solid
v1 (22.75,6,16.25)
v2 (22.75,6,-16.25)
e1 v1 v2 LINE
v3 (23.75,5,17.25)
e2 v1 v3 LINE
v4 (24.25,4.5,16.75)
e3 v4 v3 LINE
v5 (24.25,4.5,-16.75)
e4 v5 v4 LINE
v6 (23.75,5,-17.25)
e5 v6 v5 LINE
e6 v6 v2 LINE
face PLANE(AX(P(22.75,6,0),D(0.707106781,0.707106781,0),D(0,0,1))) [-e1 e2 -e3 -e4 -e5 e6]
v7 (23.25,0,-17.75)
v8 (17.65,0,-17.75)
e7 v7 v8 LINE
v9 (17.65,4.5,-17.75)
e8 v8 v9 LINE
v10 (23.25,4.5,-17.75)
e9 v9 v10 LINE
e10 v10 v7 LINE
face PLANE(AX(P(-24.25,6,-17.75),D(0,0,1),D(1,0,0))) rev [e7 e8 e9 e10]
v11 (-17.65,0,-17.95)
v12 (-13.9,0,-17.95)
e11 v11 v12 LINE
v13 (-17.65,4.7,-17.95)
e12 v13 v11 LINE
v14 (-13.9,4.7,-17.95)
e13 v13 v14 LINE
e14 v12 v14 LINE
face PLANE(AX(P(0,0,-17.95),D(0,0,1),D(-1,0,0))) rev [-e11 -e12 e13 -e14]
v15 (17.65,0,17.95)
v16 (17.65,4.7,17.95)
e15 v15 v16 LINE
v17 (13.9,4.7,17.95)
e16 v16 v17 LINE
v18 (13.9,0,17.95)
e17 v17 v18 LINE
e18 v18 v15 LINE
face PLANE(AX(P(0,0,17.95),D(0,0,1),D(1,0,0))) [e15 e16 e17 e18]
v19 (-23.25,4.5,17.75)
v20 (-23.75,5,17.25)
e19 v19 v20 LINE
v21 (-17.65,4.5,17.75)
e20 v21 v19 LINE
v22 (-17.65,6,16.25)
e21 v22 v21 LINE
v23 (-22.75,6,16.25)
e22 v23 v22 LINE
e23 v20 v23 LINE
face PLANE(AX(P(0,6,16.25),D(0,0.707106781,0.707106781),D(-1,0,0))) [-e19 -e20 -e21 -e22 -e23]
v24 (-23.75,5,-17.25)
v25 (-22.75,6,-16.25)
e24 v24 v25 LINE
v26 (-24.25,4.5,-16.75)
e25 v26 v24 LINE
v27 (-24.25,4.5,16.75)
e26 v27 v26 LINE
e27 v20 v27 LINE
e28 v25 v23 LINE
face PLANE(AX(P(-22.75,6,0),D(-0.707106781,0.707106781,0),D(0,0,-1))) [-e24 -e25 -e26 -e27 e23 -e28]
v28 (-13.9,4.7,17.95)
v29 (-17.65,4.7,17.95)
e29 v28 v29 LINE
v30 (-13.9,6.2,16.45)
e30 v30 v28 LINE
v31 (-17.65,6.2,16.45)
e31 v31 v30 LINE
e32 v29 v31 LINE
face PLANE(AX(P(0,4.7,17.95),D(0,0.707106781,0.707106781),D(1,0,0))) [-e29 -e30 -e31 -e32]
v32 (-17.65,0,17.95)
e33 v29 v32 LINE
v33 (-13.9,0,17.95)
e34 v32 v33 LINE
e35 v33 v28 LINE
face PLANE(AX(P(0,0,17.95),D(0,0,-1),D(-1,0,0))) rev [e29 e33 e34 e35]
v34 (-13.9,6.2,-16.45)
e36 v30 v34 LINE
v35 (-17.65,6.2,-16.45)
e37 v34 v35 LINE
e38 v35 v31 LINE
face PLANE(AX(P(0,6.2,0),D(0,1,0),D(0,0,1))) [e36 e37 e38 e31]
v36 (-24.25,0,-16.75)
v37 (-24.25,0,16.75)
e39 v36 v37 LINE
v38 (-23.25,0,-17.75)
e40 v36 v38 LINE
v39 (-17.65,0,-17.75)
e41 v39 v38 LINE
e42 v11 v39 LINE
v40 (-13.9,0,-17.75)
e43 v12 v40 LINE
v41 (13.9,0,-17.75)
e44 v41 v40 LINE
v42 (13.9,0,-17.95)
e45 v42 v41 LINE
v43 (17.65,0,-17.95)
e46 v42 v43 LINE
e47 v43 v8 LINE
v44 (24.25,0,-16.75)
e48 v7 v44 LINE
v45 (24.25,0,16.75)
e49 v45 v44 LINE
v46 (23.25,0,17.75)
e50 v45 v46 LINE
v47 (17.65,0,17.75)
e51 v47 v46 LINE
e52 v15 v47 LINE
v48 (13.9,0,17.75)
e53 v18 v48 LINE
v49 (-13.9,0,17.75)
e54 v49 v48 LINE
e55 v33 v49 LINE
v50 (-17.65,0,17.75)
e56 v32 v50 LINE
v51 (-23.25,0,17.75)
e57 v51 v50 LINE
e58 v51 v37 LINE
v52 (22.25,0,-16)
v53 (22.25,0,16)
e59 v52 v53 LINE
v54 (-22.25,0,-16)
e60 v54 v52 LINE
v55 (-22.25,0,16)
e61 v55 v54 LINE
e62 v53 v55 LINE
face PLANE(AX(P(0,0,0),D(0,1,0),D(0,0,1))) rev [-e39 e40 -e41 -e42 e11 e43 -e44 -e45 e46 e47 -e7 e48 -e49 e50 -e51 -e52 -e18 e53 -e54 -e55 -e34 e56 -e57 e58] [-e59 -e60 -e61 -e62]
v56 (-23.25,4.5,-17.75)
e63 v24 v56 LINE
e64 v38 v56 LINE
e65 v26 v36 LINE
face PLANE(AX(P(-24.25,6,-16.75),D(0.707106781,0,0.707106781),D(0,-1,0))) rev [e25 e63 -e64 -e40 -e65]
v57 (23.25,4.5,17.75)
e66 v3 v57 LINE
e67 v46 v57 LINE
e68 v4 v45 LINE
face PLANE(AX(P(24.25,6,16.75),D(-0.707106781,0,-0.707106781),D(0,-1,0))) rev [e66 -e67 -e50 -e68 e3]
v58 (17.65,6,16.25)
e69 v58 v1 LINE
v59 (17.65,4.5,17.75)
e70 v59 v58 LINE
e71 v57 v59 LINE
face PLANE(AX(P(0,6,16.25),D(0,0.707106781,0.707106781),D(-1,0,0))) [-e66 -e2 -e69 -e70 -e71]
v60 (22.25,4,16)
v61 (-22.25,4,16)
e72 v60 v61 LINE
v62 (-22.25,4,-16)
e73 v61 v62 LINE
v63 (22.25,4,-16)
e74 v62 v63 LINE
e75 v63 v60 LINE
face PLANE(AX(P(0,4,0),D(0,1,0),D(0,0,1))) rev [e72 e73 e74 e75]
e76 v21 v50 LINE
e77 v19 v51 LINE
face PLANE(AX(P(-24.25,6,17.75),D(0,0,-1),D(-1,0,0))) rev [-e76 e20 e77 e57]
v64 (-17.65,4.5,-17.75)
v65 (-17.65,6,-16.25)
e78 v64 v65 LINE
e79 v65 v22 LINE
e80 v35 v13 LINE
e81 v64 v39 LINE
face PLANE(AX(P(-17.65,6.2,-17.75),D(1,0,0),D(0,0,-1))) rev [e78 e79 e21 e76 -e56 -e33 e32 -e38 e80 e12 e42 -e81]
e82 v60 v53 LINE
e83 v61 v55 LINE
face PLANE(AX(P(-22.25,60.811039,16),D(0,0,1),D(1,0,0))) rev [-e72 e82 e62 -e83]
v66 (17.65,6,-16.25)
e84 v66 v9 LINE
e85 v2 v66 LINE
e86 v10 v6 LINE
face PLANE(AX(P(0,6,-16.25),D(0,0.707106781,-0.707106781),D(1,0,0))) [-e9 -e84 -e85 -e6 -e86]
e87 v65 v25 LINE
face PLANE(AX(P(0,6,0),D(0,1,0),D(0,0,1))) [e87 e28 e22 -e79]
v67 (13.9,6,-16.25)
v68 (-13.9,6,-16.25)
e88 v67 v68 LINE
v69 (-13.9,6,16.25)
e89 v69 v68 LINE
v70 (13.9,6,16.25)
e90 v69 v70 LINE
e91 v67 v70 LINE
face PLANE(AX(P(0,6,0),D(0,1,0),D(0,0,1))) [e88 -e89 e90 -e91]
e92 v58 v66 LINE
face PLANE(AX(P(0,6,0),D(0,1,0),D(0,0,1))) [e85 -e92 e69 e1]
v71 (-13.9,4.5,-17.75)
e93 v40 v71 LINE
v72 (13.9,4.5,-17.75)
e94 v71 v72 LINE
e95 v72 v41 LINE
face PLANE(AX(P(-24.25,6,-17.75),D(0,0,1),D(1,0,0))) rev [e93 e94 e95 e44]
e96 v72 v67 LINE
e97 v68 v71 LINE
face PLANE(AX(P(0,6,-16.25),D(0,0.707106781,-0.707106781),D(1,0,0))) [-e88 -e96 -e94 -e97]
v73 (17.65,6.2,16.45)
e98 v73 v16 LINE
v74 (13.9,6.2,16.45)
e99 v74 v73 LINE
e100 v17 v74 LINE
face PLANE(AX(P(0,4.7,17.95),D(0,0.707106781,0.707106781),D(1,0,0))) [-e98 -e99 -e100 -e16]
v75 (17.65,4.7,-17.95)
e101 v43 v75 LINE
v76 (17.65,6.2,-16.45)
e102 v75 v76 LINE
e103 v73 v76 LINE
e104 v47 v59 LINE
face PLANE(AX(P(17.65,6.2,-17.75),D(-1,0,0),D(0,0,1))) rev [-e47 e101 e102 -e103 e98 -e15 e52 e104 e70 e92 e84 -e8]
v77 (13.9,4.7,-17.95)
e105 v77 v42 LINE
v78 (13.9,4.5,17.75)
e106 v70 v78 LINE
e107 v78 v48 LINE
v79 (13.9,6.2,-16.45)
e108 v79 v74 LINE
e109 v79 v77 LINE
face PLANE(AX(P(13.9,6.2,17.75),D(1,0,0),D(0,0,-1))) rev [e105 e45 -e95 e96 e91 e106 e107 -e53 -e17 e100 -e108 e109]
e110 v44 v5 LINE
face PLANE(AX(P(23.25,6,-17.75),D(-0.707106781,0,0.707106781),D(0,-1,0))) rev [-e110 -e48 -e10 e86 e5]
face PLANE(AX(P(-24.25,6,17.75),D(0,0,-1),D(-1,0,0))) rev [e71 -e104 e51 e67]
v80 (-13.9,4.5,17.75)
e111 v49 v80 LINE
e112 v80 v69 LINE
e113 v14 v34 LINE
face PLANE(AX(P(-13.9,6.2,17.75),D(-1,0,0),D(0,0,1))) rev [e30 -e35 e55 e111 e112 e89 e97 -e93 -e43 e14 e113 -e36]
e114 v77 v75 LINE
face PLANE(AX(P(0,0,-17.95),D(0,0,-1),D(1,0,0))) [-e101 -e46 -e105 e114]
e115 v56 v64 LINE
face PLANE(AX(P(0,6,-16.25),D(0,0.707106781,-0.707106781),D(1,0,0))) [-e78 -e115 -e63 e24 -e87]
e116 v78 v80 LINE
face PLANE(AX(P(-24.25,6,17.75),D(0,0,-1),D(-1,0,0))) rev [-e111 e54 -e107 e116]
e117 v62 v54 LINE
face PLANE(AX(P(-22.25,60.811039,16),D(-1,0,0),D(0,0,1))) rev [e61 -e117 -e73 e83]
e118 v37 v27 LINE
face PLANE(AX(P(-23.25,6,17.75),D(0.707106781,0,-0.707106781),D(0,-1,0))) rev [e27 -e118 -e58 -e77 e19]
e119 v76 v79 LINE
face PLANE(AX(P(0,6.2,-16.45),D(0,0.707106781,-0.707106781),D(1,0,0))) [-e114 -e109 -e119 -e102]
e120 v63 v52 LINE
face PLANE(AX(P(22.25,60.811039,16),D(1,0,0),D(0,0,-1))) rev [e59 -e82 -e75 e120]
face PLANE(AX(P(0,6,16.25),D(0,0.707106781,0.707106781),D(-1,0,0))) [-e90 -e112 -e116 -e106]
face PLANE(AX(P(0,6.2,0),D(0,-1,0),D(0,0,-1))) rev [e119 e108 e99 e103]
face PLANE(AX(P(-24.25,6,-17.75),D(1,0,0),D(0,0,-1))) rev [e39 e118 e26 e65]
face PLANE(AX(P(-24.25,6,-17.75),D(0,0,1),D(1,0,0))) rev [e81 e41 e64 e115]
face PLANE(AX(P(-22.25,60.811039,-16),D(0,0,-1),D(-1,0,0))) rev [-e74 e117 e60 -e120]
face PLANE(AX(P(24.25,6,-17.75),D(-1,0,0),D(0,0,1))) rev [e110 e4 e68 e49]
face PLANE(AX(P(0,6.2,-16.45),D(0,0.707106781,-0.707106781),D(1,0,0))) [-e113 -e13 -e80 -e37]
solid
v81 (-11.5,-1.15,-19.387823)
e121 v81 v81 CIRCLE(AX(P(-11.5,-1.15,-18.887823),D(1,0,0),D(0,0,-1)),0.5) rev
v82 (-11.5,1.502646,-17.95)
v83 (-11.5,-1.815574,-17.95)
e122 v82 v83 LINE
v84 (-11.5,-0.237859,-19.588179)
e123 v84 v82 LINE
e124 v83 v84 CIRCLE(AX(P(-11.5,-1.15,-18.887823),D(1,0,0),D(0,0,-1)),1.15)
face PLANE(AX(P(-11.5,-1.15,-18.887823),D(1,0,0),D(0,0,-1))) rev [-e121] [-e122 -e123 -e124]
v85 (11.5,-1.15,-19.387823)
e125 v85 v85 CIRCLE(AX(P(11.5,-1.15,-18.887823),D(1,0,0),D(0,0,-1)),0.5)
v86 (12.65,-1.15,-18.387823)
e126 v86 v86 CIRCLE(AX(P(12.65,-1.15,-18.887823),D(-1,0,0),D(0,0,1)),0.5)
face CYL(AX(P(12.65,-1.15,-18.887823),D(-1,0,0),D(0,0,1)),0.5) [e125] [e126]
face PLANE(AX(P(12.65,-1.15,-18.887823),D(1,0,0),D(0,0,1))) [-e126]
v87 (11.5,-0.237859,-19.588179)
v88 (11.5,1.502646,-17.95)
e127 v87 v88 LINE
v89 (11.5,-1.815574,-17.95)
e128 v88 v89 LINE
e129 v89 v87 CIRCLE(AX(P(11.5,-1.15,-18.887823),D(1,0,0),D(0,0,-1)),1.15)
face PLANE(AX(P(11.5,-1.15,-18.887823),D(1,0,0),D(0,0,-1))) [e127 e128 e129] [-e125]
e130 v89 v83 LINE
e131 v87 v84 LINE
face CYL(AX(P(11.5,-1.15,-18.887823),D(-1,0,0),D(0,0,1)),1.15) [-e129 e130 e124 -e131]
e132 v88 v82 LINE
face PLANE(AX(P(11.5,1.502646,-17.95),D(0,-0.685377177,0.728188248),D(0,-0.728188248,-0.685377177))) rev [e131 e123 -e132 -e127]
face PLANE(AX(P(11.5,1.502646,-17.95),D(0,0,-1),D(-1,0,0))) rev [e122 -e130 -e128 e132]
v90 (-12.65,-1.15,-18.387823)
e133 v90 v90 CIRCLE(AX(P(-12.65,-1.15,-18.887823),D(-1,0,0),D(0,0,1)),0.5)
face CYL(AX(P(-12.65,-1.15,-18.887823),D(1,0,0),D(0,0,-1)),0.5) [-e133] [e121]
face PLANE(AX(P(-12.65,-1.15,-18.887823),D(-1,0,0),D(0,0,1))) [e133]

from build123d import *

# Parameters (mm, degrees)
CROQUIS1_W              = 48.5
CROQUIS1_H              = 35.5
SALIENTE_EXTRUIR1_DEPTH = 6
CHAFL_N1_SIZE           = 1
CROQUIS3_W              = 3.75
CROQUIS3_H              = 35.5
SALIENTE_EXTRUIR3_DEPTH = 0.2
CROQUIS4_W              = 3.75
CROQUIS4_H              = 6.2
SALIENTE_EXTRUIR4_DEPTH = 0.2
CROQUIS2_W              = 44.5
CROQUIS2_H              = 32
CORTAR_EXTRUIR1_DEPTH   = 4
CHAFL_N2_SIZE           = 1.5
SALIENTE_EXTRUIR5_DEPTH = 11.5
CROQUIS6_R              = 0.5
SALIENTE_EXTRUIR6_DEPTH = 1.15


with BuildPart() as part:
    # Croquis1 → Saliente-Extruir1 (new body)
    with BuildSketch(Plane(origin=(19.920493139, 0, 21.30129266), x_dir=(1, 0, 0), z_dir=(0, 1, 0))):
        with Locations((-19.920493139, 21.30129266)):
            Rectangle(CROQUIS1_W, CROQUIS1_H)
    extrude(amount=SALIENTE_EXTRUIR1_DEPTH)

    # Chaflán1
    chafl_n1_edges = [part.edges().sort_by_distance(p)[0] for p in [
        (24.25, 3, 17.75),
        (-24.25, 3, 17.75),
        (-24.25, 3, -17.75),
        (24.25, 3, -17.75),
    ]]
    chamfer(chafl_n1_edges, length=CHAFL_N1_SIZE)

    # Croquis3 → Saliente-Extruir3 (add)
    with BuildSketch(Plane(origin=(0, 6, 0), x_dir=(1, 0, 0), z_dir=(0, 1, 0))):
        with Locations((15.775, 0)):
            Rectangle(CROQUIS3_W, CROQUIS3_H)
        with Locations((-15.775, 0)):
            Rectangle(CROQUIS3_W, CROQUIS3_H)
    extrude(amount=SALIENTE_EXTRUIR3_DEPTH)

    # Croquis4 → Saliente-Extruir4 (add)
    with BuildSketch(Plane.XY.offset(17.75)):
        with Locations((15.775, 3.1)):
            Rectangle(CROQUIS4_W, CROQUIS4_H)
        with Locations((-15.775, 3.1)):
            Rectangle(CROQUIS4_W, CROQUIS4_H)
    saliente_extruir4 = extrude(amount=SALIENTE_EXTRUIR4_DEPTH)

    # Croquis2 → Cortar-Extruir1 (cut)
    with BuildSketch(Plane.XZ):
        Rectangle(CROQUIS2_W, CROQUIS2_H)
    extrude(amount=-CORTAR_EXTRUIR1_DEPTH, mode=Mode.SUBTRACT)

    # Simetría1: Saliente-Extruir4 across plane
    add(saliente_extruir4.mirror(Plane.XY))

    # Chaflán2
    # the kernel refuses this chamfer: 1.5 mm, written as the material it takes off along each edge
    with BuildSketch(Plane(origin=(-21.507524482, 6.2, -17.95), x_dir=(0, 0.02749587661058619, 0.9996219169112968), z_dir=(1, 0, 0)), Plane(origin=(21.507524482, 6.2, -17.95), x_dir=(0, -0.9996219169112968, -0.02749587661058678), z_dir=(-1, 0, 0)), Plane(origin=(-21.507524482, 6.2, 17.95), x_dir=(0, -0.9996219169112968, 0.02749587661058678), z_dir=(1, 0, 0)), Plane(origin=(21.507524482, 6.2, 17.95), x_dir=(0, 0.02749587661058619, -0.9996219169112968), z_dir=(-1, 0, 0))) as chafl_n2_piece_1:
        Polygon((CHAFL_N2_SIZE * 0.999621916911, CHAFL_N2_SIZE * 0.0274958766106), (-CHAFL_N2_SIZE * 0.0274958766106, CHAFL_N2_SIZE * 0.999621916911), (0, 0), align=None)
    extrude(amount=11.465048964, mode=Mode.SUBTRACT)
    with BuildSketch(Plane(origin=(24.25, 6, -20.607524482), x_dir=(0.02749587661058678, -0.9996219169112968, 0), z_dir=(0, 0, 1)), Plane(origin=(-24.25, 6, 20.607524482), x_dir=(-0.02749587661058678, -0.9996219169112968, 0), z_dir=(0, 0, -1))) as chafl_n2_piece_2:
        Polygon((CHAFL_N2_SIZE * 0.999621916911, -CHAFL_N2_SIZE * 0.0274958766106), (-CHAFL_N2_SIZE * 0.0274958766106, -CHAFL_N2_SIZE * 0.999621916911), (0, 0), align=None)
    extrude(amount=41.215048964, mode=Mode.SUBTRACT)
    with BuildSketch(Plane(origin=(27.107524482, 6, 17.75), x_dir=(0, 0.02749587661058619, -0.9996219169112968), z_dir=(-1, 0, 0))) as chafl_n2_piece_3:
        Polygon((CHAFL_N2_SIZE * 0.999621916911, CHAFL_N2_SIZE * 0.0274958766106), (-CHAFL_N2_SIZE * 0.0274958766106, CHAFL_N2_SIZE * 0.999621916911), (0, 0), align=None)
    extrude(amount=9.457524482, mode=Mode.SUBTRACT)
    with BuildSketch(Plane(origin=(27.107524482, 6, 17.75), x_dir=(0, 0.02749587661058619, -0.9996219169112968), z_dir=(-1, 0, 0))) as chafl_n2_piece_4_section:
        Polygon((CHAFL_N2_SIZE * 0.999621916911, CHAFL_N2_SIZE * 0.0274958766106), (-CHAFL_N2_SIZE * 0.0274958766106, CHAFL_N2_SIZE * 0.999621916911), (0, 0), align=None)
    chafl_n2_piece_4 = extrude(amount=13.315048964, mode=Mode.PRIVATE)
    chafl_n2_piece_4 = split(chafl_n2_piece_4, bisect_by=Plane(origin=(13.9, 5.50530956, 17.25530956), z_dir=(-1, 0, 0)), keep=Keep.TOP, mode=Mode.PRIVATE)
    add(chafl_n2_piece_4, mode=Mode.SUBTRACT)
    with BuildSketch(Plane(origin=(13.792475518, 6, -17.75), x_dir=(0, -0.9996219169112968, -0.02749587661058678), z_dir=(1, 0, 0))) as chafl_n2_piece_5_section:
        Polygon((CHAFL_N2_SIZE * 0.999621916911, -CHAFL_N2_SIZE * 0.0274958766106), (-CHAFL_N2_SIZE * 0.0274958766106, -CHAFL_N2_SIZE * 0.999621916911), (0, 0), align=None)
    chafl_n2_piece_5 = extrude(amount=13.315048964, mode=Mode.PRIVATE)
    chafl_n2_piece_5 = split(chafl_n2_piece_5, bisect_by=Plane(origin=(13.9, 5.50530956, -17.25530956), z_dir=(-1, 0, 0)), keep=Keep.TOP, mode=Mode.PRIVATE)
    add(chafl_n2_piece_5, mode=Mode.SUBTRACT)
    with BuildSketch(Plane(origin=(17.65, 6, -17.75), x_dir=(0, -0.9996219169112968, -0.02749587661058678), z_dir=(1, 0, 0)), Plane(origin=(-27.107524482, 6, -17.75), x_dir=(0, -0.9996219169112968, -0.02749587661058678), z_dir=(1, 0, 0)), Plane(origin=(-17.65, 6, 17.75), x_dir=(0, -0.9996219169112968, 0.02749587661058678), z_dir=(-1, 0, 0))) as chafl_n2_piece_6:
        Polygon((CHAFL_N2_SIZE * 0.999621916911, -CHAFL_N2_SIZE * 0.0274958766106), (-CHAFL_N2_SIZE * 0.0274958766106, -CHAFL_N2_SIZE * 0.999621916911), (0, 0), align=None)
    extrude(amount=9.457524482, mode=Mode.SUBTRACT)
    with BuildSketch(Plane(origin=(-17.757524482, 6, -17.75), x_dir=(0, -0.9996219169112968, -0.02749587661058678), z_dir=(1, 0, 0))) as chafl_n2_piece_7_section:
        Polygon((CHAFL_N2_SIZE * 0.999621916911, -CHAFL_N2_SIZE * 0.0274958766106), (-CHAFL_N2_SIZE * 0.0274958766106, -CHAFL_N2_SIZE * 0.999621916911), (0, 0), align=None)
    chafl_n2_piece_7 = extrude(amount=31.657524482, mode=Mode.PRIVATE)
    chafl_n2_piece_7 = split(chafl_n2_piece_7, bisect_by=Plane(origin=(-17.65, 5.50530956, -17.25530956), z_dir=(-1, 0, 0)), keep=Keep.TOP, mode=Mode.PRIVATE)
    add(chafl_n2_piece_7, mode=Mode.SUBTRACT)
    with BuildSketch(Plane(origin=(-13.9, 6, -17.75), x_dir=(0, -0.9996219169112968, -0.02749587661058678), z_dir=(1, 0, 0)), Plane(origin=(13.9, 6, 17.75), x_dir=(0, -0.9996219169112968, 0.02749587661058678), z_dir=(-1, 0, 0))) as chafl_n2_piece_8:
        Polygon((CHAFL_N2_SIZE * 0.999621916911, -CHAFL_N2_SIZE * 0.0274958766106), (-CHAFL_N2_SIZE * 0.0274958766106, -CHAFL_N2_SIZE * 0.999621916911), (0, 0), align=None)
    extrude(amount=27.8, mode=Mode.SUBTRACT)
    with BuildSketch(Plane(origin=(-13.9, 6, -17.75), x_dir=(0, -0.9996219169112968, -0.02749587661058678), z_dir=(1, 0, 0))) as chafl_n2_piece_9_section:
        Polygon((CHAFL_N2_SIZE * 0.999621916911, -CHAFL_N2_SIZE * 0.0274958766106), (-CHAFL_N2_SIZE * 0.0274958766106, -CHAFL_N2_SIZE * 0.999621916911), (0, 0), align=None)
    chafl_n2_piece_9 = extrude(amount=31.657524482, mode=Mode.PRIVATE)
    chafl_n2_piece_9 = split(chafl_n2_piece_9, bisect_by=Plane(origin=(17.65, 5.50530956, -17.25530956), z_dir=(1, 0, 0)), keep=Keep.TOP, mode=Mode.PRIVATE)
    add(chafl_n2_piece_9, mode=Mode.SUBTRACT)
    with BuildSketch(Plane(origin=(-27.107524482, 6, -17.75), x_dir=(0, -0.9996219169112968, -0.02749587661058678), z_dir=(1, 0, 0))) as chafl_n2_piece_10_section:
        Polygon((CHAFL_N2_SIZE * 0.999621916911, -CHAFL_N2_SIZE * 0.0274958766106), (-CHAFL_N2_SIZE * 0.0274958766106, -CHAFL_N2_SIZE * 0.999621916911), (0, 0), align=None)
    chafl_n2_piece_10 = extrude(amount=13.315048964, mode=Mode.PRIVATE)
    chafl_n2_piece_10 = split(chafl_n2_piece_10, bisect_by=Plane(origin=(-13.9, 5.50530956, -17.25530956), z_dir=(1, 0, 0)), keep=Keep.TOP, mode=Mode.PRIVATE)
    add(chafl_n2_piece_10, mode=Mode.SUBTRACT)
    with BuildSketch(Plane(origin=(-13.792475518, 6, 17.75), x_dir=(0, -0.9996219169112968, 0.02749587661058678), z_dir=(-1, 0, 0))) as chafl_n2_piece_11_section:
        Polygon((CHAFL_N2_SIZE * 0.999621916911, -CHAFL_N2_SIZE * 0.0274958766106), (-CHAFL_N2_SIZE * 0.0274958766106, -CHAFL_N2_SIZE * 0.999621916911), (0, 0), align=None)
    chafl_n2_piece_11 = extrude(amount=13.315048964, mode=Mode.PRIVATE)
    chafl_n2_piece_11 = split(chafl_n2_piece_11, bisect_by=Plane(origin=(-13.9, 5.50530956, 17.25530956), z_dir=(1, 0, 0)), keep=Keep.TOP, mode=Mode.PRIVATE)
    add(chafl_n2_piece_11, mode=Mode.SUBTRACT)
    with BuildSketch(Plane(origin=(17.757524482, 6, 17.75), x_dir=(0, -0.9996219169112968, 0.02749587661058678), z_dir=(-1, 0, 0))) as chafl_n2_piece_12_section:
        Polygon((CHAFL_N2_SIZE * 0.999621916911, -CHAFL_N2_SIZE * 0.0274958766106), (-CHAFL_N2_SIZE * 0.0274958766106, -CHAFL_N2_SIZE * 0.999621916911), (0, 0), align=None)
    chafl_n2_piece_12 = extrude(amount=31.657524482, mode=Mode.PRIVATE)
    chafl_n2_piece_12 = split(chafl_n2_piece_12, bisect_by=Plane(origin=(17.65, 5.50530956, 17.25530956), z_dir=(1, 0, 0)), keep=Keep.TOP, mode=Mode.PRIVATE)
    add(chafl_n2_piece_12, mode=Mode.SUBTRACT)
    with BuildSketch(Plane(origin=(13.9, 6, 17.75), x_dir=(0, -0.9996219169112968, 0.02749587661058678), z_dir=(-1, 0, 0))) as chafl_n2_piece_13_section:
        Polygon((CHAFL_N2_SIZE * 0.999621916911, -CHAFL_N2_SIZE * 0.0274958766106), (-CHAFL_N2_SIZE * 0.0274958766106, -CHAFL_N2_SIZE * 0.999621916911), (0, 0), align=None)
    chafl_n2_piece_13 = extrude(amount=31.657524482, mode=Mode.PRIVATE)
    chafl_n2_piece_13 = split(chafl_n2_piece_13, bisect_by=Plane(origin=(-17.65, 5.50530956, 17.25530956), z_dir=(-1, 0, 0)), keep=Keep.TOP, mode=Mode.PRIVATE)
    add(chafl_n2_piece_13, mode=Mode.SUBTRACT)


with BuildPart() as body_2:
    # Croquis5 → Saliente-Extruir5 (new, symmetric)
    with BuildSketch(Plane(origin=(0, 0, 0), x_dir=(0, 0, -1), z_dir=(1, 0, 0))):
        with BuildLine():
            Line((17.95, 1.502646226), (19.588178522, -0.237858692))
            ThreePointArc((19.588178522, -0.237858692), (19.685565736, -1.978315216), (17.95, -1.815573833))
            Line((17.95, -1.815573833), (17.95, 1.502646226))
        make_face()
    extrude(amount=SALIENTE_EXTRUIR5_DEPTH, both=True)

    # Croquis6 → Saliente-Extruir6 (add, symmetric)
    with BuildSketch(Plane.ZY.offset(11.5)):
        with Locations(Location((-18.88782273, -1.15, 0), (0, 0, 180))):
            Circle(CROQUIS6_R)
    saliente_extruir6 = extrude(amount=SALIENTE_EXTRUIR6_DEPTH, both=True)

    # Simetría2: Saliente-Extruir6 across plane
    add(saliente_extruir6.mirror(Plane(origin=(0, 0, 0), x_dir=(0, 0, 1), z_dir=(1, 0, 0))))


solid = Compound([part.part, body_2.part])
